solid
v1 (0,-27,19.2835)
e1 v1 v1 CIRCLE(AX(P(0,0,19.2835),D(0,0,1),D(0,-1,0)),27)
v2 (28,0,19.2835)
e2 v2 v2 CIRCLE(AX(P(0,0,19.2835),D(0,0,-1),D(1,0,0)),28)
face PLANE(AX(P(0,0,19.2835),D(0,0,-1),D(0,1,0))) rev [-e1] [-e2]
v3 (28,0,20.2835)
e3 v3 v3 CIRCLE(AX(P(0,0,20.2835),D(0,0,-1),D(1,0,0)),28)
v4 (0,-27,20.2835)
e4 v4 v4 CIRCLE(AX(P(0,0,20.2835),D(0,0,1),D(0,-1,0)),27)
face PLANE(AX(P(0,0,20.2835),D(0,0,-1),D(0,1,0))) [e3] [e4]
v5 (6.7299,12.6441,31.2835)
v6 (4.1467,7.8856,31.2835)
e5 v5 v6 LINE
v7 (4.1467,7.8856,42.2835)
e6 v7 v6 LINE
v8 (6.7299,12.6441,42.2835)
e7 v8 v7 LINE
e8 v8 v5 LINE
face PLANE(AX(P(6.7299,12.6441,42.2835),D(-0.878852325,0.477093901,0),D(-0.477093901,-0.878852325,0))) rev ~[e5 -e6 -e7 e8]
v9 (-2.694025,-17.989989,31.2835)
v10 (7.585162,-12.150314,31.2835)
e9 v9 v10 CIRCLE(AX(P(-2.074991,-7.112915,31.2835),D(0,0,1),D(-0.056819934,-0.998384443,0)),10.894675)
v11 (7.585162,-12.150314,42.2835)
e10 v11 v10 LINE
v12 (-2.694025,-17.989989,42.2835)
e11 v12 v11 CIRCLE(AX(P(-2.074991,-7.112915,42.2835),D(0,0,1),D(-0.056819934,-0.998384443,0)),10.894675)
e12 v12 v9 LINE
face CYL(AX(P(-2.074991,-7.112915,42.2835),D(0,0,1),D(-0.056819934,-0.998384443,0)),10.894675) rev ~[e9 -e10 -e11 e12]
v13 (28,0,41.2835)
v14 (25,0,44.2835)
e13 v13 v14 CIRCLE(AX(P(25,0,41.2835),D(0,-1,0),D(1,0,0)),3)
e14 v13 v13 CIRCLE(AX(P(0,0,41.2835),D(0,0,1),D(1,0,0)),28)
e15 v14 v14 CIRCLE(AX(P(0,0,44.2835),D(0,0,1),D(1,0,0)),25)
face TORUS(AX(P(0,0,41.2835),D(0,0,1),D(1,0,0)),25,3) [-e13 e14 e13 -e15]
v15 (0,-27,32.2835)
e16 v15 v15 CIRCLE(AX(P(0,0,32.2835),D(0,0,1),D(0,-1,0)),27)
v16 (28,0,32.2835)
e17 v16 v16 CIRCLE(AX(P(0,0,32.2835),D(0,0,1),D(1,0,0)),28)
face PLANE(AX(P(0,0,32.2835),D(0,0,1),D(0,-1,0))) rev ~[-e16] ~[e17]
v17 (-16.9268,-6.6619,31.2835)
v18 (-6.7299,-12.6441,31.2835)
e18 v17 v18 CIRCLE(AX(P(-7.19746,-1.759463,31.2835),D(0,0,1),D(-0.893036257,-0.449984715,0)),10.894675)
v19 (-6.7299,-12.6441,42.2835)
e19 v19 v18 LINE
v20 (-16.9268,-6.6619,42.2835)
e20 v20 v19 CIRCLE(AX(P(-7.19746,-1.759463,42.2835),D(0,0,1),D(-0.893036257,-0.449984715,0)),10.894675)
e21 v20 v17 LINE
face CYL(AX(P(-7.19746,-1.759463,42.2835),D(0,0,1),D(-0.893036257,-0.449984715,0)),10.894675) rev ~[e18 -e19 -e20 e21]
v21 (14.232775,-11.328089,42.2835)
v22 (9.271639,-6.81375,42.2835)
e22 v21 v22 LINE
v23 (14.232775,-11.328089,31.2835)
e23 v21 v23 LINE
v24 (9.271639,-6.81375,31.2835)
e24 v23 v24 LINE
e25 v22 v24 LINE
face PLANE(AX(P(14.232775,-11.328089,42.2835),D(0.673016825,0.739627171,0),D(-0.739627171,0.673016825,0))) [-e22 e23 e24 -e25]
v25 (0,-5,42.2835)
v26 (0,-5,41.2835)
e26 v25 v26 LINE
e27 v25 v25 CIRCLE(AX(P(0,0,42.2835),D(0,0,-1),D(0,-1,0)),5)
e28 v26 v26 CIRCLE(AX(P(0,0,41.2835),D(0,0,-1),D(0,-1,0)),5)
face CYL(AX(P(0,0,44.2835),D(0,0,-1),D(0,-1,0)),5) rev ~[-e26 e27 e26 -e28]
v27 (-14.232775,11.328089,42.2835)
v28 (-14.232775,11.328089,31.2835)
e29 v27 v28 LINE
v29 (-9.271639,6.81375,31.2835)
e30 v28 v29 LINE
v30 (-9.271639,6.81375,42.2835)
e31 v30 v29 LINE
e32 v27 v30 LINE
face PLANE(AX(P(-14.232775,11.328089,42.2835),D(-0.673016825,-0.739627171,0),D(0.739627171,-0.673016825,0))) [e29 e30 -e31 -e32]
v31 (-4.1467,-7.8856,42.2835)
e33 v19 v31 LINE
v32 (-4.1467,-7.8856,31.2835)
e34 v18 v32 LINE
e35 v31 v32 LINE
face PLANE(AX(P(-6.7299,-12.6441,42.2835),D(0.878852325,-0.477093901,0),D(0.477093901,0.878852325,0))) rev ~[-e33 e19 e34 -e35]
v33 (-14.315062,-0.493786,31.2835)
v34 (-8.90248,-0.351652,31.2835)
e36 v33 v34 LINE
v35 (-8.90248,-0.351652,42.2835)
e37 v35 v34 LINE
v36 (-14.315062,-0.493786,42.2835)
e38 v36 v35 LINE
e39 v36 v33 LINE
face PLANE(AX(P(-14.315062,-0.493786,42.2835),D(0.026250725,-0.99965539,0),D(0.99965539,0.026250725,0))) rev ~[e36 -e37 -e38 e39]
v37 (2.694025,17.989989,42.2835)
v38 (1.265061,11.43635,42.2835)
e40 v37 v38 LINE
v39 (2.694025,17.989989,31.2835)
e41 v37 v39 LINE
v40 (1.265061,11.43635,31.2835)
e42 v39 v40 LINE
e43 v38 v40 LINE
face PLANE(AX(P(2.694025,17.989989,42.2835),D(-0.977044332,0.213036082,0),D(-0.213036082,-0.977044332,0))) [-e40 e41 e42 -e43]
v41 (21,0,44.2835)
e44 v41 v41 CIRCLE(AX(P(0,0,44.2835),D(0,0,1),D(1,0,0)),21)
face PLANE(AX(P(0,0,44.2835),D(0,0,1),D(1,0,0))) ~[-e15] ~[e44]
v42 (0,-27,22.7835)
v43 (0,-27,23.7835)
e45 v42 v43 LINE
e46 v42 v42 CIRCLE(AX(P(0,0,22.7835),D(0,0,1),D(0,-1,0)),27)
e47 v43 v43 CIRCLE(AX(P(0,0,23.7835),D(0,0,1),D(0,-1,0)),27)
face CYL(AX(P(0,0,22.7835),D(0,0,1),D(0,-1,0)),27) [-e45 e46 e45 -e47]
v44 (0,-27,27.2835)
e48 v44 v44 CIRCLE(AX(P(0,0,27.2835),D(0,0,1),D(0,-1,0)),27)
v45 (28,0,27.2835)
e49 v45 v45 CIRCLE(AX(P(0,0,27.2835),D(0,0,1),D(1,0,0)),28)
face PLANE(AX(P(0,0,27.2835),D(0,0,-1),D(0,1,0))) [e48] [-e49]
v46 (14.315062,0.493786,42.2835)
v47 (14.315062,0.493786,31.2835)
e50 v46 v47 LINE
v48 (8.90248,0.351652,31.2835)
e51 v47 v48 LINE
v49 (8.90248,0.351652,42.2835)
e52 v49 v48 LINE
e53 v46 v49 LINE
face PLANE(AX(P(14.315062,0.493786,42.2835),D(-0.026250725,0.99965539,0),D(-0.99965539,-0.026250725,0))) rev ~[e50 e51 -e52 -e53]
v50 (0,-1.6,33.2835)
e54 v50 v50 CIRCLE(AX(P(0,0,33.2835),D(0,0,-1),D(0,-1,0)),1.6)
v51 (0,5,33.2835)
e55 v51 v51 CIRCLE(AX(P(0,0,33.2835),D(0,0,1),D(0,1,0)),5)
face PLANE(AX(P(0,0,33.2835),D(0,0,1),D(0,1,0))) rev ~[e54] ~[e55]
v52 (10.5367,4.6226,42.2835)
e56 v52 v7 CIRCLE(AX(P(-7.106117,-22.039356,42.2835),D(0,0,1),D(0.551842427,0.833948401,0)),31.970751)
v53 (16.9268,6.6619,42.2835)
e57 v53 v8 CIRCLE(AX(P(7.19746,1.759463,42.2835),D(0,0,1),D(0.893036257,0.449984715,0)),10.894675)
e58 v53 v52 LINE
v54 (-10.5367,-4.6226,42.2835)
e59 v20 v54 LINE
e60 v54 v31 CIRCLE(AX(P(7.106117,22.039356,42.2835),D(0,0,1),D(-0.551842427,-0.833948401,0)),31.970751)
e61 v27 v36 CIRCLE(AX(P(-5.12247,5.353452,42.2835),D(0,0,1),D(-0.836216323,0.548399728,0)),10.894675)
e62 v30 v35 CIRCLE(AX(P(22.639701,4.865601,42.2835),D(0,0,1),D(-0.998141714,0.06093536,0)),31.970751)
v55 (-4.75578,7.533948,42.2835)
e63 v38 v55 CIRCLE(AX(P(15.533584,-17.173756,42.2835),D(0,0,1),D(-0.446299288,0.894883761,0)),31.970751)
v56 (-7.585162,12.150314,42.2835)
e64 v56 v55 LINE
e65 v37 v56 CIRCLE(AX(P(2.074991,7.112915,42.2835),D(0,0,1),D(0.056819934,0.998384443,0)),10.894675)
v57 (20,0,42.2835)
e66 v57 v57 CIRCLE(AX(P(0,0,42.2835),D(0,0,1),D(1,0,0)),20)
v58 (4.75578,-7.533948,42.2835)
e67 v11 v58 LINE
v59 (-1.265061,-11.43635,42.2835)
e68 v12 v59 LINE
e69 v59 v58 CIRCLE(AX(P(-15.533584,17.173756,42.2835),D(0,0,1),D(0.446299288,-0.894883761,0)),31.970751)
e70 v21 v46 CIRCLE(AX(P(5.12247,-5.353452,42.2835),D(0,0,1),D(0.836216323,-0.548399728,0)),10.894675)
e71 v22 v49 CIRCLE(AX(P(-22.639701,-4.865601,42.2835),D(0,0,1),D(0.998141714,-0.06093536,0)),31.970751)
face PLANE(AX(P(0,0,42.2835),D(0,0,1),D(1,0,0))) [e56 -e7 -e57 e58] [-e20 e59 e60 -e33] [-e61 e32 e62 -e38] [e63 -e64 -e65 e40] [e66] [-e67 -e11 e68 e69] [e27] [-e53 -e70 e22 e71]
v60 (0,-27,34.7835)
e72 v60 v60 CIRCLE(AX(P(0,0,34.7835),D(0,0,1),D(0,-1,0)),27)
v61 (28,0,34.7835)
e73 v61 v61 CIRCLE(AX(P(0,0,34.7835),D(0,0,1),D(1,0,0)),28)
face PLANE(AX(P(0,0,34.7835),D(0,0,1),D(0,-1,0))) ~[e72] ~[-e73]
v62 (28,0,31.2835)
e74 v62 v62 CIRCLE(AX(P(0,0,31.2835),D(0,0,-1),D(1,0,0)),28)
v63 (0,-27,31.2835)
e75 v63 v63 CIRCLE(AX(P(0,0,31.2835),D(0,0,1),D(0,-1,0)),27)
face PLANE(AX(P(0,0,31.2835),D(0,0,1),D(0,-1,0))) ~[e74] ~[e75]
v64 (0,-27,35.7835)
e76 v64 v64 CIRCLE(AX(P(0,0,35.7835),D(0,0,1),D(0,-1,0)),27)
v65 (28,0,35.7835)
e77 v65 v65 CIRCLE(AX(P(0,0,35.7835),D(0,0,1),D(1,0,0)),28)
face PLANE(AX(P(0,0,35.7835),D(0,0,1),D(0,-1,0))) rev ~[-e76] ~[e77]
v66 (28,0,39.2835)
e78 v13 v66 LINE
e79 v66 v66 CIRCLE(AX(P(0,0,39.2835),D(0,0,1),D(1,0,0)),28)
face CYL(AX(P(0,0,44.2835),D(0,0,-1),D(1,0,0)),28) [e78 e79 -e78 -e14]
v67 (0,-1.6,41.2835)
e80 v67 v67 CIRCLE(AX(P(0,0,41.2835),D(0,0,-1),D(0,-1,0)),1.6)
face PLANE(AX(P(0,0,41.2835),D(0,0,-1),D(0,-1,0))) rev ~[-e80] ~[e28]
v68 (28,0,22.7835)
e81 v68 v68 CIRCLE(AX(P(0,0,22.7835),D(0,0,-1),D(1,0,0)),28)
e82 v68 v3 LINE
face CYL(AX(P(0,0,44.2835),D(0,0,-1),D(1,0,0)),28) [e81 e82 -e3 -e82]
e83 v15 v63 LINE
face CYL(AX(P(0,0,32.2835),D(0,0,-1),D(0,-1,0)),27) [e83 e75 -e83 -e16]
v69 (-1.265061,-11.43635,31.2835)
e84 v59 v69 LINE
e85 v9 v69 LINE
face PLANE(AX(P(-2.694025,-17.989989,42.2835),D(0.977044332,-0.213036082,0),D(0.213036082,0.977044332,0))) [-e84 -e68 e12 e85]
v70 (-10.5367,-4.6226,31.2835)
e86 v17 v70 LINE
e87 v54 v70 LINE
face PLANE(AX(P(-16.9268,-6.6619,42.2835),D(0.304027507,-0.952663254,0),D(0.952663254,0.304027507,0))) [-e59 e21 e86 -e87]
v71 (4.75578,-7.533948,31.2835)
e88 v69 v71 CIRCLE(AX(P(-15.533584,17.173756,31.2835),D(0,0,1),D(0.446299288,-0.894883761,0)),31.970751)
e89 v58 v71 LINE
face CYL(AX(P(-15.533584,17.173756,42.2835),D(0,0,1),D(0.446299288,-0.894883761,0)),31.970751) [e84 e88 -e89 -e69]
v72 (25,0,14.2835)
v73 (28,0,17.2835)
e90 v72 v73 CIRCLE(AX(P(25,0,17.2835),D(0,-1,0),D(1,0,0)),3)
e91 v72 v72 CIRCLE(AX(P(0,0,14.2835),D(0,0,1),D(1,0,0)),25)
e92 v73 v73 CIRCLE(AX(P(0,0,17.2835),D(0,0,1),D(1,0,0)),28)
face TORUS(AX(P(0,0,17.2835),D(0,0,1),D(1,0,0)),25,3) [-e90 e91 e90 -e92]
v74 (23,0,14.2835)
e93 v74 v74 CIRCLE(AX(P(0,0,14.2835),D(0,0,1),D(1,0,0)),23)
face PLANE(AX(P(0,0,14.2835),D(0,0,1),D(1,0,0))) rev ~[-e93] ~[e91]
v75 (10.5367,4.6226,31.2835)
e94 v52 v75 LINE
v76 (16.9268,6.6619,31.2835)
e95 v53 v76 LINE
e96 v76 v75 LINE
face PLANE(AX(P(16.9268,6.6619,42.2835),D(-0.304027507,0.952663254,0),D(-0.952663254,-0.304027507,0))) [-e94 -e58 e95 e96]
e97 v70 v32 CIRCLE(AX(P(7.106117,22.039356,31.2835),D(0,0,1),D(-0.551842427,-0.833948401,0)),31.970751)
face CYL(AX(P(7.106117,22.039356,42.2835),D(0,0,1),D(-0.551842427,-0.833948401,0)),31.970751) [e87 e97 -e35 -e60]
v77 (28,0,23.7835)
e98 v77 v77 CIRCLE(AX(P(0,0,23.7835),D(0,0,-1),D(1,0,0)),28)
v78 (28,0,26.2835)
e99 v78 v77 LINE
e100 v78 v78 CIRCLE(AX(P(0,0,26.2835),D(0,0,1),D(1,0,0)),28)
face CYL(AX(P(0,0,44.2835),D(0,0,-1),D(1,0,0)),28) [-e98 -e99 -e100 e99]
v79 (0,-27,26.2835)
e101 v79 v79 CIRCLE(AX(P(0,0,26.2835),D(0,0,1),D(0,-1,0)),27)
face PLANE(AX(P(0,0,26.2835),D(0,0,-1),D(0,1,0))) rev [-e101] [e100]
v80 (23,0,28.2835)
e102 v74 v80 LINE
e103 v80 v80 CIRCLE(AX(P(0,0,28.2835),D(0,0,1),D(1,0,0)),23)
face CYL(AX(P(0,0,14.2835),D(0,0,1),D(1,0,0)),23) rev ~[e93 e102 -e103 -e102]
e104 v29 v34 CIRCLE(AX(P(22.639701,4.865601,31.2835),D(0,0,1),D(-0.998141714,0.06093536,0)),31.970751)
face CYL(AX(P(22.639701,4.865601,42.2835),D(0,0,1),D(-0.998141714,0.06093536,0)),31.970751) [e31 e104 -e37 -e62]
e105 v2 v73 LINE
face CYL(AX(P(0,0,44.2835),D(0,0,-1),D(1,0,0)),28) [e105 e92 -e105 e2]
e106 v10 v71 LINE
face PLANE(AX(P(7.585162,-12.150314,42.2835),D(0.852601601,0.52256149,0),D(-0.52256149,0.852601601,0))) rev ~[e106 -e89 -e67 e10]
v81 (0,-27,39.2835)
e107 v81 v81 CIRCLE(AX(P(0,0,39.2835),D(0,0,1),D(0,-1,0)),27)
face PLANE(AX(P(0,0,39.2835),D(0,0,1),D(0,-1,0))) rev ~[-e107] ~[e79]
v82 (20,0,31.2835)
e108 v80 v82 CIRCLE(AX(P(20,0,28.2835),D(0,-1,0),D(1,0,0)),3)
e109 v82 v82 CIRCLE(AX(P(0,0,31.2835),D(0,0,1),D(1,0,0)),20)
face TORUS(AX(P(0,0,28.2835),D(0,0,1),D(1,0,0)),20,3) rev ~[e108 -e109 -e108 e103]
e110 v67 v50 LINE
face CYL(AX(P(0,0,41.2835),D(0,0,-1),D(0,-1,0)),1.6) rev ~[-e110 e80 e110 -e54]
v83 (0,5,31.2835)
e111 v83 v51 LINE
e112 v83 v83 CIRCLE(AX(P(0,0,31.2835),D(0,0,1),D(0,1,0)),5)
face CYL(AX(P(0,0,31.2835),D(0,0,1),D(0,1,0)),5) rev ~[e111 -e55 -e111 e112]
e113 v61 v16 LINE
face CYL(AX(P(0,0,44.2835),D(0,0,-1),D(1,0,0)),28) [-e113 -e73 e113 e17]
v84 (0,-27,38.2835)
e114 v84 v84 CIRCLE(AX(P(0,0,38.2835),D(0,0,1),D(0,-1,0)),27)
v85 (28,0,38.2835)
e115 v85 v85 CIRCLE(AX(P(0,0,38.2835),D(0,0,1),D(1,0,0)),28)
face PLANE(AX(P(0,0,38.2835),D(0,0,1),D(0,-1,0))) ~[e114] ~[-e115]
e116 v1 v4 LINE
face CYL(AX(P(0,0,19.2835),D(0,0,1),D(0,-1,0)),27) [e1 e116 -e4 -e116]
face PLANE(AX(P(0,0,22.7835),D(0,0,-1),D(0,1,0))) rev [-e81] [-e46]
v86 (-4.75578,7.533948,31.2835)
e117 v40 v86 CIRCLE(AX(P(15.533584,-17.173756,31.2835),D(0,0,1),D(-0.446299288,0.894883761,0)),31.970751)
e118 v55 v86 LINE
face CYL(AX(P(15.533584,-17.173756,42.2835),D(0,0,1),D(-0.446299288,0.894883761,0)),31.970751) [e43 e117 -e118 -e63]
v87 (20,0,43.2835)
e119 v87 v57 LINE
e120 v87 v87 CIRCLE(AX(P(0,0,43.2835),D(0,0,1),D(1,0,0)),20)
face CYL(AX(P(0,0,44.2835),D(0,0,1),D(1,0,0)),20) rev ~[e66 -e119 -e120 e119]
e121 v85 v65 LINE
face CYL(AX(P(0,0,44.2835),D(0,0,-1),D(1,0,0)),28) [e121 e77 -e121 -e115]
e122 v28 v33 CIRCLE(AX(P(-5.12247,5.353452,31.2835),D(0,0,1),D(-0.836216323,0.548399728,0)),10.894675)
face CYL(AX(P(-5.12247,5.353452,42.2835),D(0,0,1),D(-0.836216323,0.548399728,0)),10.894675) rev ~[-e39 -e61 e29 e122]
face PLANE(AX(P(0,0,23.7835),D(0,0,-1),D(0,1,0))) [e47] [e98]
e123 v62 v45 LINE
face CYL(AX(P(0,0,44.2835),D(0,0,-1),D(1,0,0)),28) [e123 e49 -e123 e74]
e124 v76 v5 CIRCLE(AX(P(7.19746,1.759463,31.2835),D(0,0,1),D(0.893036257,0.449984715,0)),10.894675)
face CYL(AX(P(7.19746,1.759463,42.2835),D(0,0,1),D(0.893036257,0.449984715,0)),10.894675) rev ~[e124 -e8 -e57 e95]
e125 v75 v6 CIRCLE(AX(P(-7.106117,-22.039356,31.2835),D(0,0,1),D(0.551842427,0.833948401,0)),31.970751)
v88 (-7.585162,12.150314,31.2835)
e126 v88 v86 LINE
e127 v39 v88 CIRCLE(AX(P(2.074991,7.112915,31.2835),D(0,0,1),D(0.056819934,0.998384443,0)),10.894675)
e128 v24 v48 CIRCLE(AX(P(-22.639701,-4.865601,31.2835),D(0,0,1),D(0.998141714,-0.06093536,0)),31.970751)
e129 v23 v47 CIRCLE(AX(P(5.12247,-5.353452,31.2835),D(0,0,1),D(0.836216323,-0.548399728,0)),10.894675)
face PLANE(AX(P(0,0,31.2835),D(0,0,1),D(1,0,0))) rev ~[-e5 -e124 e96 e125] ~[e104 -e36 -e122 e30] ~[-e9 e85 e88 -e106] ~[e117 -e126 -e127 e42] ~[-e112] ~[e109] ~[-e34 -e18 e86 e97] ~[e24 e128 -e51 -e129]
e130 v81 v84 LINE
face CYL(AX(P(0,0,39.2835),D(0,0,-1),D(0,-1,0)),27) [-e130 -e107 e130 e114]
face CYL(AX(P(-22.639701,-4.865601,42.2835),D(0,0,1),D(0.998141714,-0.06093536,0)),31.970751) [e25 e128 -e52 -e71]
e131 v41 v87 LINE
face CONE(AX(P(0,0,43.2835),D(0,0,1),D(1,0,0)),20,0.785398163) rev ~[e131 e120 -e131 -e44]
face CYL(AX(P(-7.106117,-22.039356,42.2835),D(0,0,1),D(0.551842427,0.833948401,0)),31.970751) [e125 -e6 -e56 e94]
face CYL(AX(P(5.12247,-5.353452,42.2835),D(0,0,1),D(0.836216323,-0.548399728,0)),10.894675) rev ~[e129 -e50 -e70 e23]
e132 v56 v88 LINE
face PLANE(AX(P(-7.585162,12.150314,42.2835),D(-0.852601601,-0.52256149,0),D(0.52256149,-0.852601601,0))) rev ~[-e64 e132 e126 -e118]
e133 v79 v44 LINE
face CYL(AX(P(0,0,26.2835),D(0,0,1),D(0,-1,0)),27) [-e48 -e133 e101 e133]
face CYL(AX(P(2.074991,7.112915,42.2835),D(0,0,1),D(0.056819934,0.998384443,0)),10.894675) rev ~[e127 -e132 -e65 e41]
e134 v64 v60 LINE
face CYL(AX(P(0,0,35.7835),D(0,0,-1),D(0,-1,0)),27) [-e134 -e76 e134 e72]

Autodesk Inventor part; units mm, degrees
ref_plane "YZ Plane" through (0, 0, 0) normal (1, 0, 0) x (0, 1, 0)
ref_plane "XZ Plane" through (0, 0, 0) normal (0, 1, 0) x (-1, 0, 0)
sketch "Sketch1" plane through (0, 0, 0) normal (0, 1, 0) x (-1, 0, 0)
  line L0 (0, 0) -> (0, 48.3347) construction
  line L1 (-23, 44.2835) -> (-28, 44.2835)
  line L2 (-28, 44.2835) -> (-28, 14.2835)
  line L3 (-28, 14.2835) -> (-23, 14.2835)
  line L4 (-23, 14.2835) -> (-23, 44.2835)
  point P0 (0, 23.2008)
  dimension "d2" = 5
  dimension "d3" = 30
  dimension "d4" = 23
revolve "Revolution1" add sketch "Sketch1" angle 360 about axis through (0, 0, 0) along (0, 0, 1)
sketch "Sketch7" plane through (0, 0, 44.2835) normal (0, 0, 1) x (1, 0, 0)
  circle A0 centre (0, 0) radius 24
  dimension "d33" = 48
extrude "Extrusion4" add sketch "Sketch7" against normal blind 13
fillet "Fillet4" radius 3 2 edges at (-28, 0, 44.2835) (-28, 0, 14.2835)
sketch "Sketch8" plane through (0, 0, 44.2835) normal (0, 0, 1) x (1, 0, 0)
  circle A0 centre (0, 0) radius 23 projected
  circle A1 centre (0, 0) radius 25 projected
  circle A2 centre (0, 0) radius 28 projected
  circle A3 centre (0, 0) radius 25 projected
  circle A4 centre (0, 0) radius 23
fillet "Fillet5" radius 3 1 edges at (-23, 0, 31.2835)
sketch "Sketch9" plane through (0, 0, 44.2835) normal (0, 0, 1) x (1, 0, 0)
  circle A0 centre (0, 0) radius 23 projected
  circle A1 centre (0, 0) radius 20 projected
  circle A2 centre (0, 0) radius 20
extrude "Extrusion5" cut sketch "Sketch9" against normal blind 2 contours A1
chamfer "Chamfer1" distance 1 angle 45 1 edges at (-20, 0, 44.2835)
sketch "Sketch10" plane through (0, 0, 42.2835) normal (0, 0, 1) x (1, 0, 0)
  line L0 (-16.9268, -6.6619) -> (-10.5367, -4.6226)
  line L1 (-6.7299, -12.6441) -> (-4.1467, -7.8856)
  arc A0 (-16.9268, -6.6619) -> (-6.7299, -12.6441) centre (-7.1975, -1.7595) ccw
  arc A1 (-10.5367, -4.6226) -> (-4.1467, -7.8856) centre (7.1055, 22.0383) ccw
  point P0 (0, 0)
extrude "Extrusion6" cut sketch "Sketch10" against normal through all
pattern_circular "Circular Pattern2" count 6 over 360 about axis through (0, 0, -10) along (0, 0, 1) of "Extrusion6"
sketch "Sketch11" plane through (0, 0, 42.2835) normal (0, 0, 1) x (1, 0, 0)
  point P0 (0, 0)
hole "Hole3" at (0, 0, 44.2835) direction (0, 0, -1) diameter 3.2 end through all counterbore diameter 10 counterbore depth 3
sketch "Sketch12" plane through (0, 0, 31.2835) normal (0, 0, -1) x (-1, 0, 0)
  point P0 (0, 0)
hole "Hole4" at (0, 0, 31.2835) direction (0, 0, 1) diameter 3.2 end through all counterbore diameter 10 counterbore depth 2
sketch "Sketch13" plane through (0, 0, 0) normal (1, 0, 0) x (0, 1, 0)
  line L0 (-28, 17.2835) -> (-28, 41.2835) projected
  line L1 (-28, 39.2835) -> (-27, 39.2835)
  line L2 (-27, 39.2835) -> (-27, 38.2835)
  line L3 (-27, 38.2835) -> (-28, 38.2835)
  line L4 (-28, 38.2835) -> (-28, 39.2835)
  line L5 (-28, 35.7835) -> (-27, 35.7835)
  line L6 (-27, 35.7835) -> (-27, 34.7835)
  line L7 (-27, 34.7835) -> (-28, 34.7835)
  line L8 (-28, 34.7835) -> (-28, 35.7835)
  line L9 (-28, 32.2835) -> (-27, 32.2835)
  line L10 (-27, 32.2835) -> (-27, 31.2835)
  line L11 (-27, 31.2835) -> (-28, 31.2835)
  line L12 (-28, 31.2835) -> (-28, 32.2835)
  line L13 (-28, 41.2835) -> (-28, 17.2835) construction
  arc A0 (-28, 17.2835) -> (-25, 14.2835) centre (-25, 17.2835) ccw construction
  line L14 (-28, 17.2835) -> (28, 17.2835) construction
  line L15 (-28, 29.2835) -> (28, 29.2835) construction
  line L16 (0, -8.8567) -> (0, 53.1402) projected
  point P0 (0, 0)
  dimension "d62" = 1
  dimension "d63" = 1
  dimension "d64" = 1
  dimension "d65" = 1
  dimension "d66" = 1
  dimension "d67" = 1
  dimension "d68" = 10
  dimension "d69" = 2.5
  dimension "d70" = 2.5
revolve "Revolution2" cut sketch "Sketch13" angle 360 about axis through (0, 0, -10) along (0, 0, 1)
ref_plane "Work Plane1" through (0, 0, 29.2835) normal (0, 0, -1) x (-1, 0, 0)
mirror "Mirror1" about plane through (0, 0, 29.2835) normal (0, 0, -1) of "Revolution2"
properties part number "Wheels1" material "ABS Plastic"
